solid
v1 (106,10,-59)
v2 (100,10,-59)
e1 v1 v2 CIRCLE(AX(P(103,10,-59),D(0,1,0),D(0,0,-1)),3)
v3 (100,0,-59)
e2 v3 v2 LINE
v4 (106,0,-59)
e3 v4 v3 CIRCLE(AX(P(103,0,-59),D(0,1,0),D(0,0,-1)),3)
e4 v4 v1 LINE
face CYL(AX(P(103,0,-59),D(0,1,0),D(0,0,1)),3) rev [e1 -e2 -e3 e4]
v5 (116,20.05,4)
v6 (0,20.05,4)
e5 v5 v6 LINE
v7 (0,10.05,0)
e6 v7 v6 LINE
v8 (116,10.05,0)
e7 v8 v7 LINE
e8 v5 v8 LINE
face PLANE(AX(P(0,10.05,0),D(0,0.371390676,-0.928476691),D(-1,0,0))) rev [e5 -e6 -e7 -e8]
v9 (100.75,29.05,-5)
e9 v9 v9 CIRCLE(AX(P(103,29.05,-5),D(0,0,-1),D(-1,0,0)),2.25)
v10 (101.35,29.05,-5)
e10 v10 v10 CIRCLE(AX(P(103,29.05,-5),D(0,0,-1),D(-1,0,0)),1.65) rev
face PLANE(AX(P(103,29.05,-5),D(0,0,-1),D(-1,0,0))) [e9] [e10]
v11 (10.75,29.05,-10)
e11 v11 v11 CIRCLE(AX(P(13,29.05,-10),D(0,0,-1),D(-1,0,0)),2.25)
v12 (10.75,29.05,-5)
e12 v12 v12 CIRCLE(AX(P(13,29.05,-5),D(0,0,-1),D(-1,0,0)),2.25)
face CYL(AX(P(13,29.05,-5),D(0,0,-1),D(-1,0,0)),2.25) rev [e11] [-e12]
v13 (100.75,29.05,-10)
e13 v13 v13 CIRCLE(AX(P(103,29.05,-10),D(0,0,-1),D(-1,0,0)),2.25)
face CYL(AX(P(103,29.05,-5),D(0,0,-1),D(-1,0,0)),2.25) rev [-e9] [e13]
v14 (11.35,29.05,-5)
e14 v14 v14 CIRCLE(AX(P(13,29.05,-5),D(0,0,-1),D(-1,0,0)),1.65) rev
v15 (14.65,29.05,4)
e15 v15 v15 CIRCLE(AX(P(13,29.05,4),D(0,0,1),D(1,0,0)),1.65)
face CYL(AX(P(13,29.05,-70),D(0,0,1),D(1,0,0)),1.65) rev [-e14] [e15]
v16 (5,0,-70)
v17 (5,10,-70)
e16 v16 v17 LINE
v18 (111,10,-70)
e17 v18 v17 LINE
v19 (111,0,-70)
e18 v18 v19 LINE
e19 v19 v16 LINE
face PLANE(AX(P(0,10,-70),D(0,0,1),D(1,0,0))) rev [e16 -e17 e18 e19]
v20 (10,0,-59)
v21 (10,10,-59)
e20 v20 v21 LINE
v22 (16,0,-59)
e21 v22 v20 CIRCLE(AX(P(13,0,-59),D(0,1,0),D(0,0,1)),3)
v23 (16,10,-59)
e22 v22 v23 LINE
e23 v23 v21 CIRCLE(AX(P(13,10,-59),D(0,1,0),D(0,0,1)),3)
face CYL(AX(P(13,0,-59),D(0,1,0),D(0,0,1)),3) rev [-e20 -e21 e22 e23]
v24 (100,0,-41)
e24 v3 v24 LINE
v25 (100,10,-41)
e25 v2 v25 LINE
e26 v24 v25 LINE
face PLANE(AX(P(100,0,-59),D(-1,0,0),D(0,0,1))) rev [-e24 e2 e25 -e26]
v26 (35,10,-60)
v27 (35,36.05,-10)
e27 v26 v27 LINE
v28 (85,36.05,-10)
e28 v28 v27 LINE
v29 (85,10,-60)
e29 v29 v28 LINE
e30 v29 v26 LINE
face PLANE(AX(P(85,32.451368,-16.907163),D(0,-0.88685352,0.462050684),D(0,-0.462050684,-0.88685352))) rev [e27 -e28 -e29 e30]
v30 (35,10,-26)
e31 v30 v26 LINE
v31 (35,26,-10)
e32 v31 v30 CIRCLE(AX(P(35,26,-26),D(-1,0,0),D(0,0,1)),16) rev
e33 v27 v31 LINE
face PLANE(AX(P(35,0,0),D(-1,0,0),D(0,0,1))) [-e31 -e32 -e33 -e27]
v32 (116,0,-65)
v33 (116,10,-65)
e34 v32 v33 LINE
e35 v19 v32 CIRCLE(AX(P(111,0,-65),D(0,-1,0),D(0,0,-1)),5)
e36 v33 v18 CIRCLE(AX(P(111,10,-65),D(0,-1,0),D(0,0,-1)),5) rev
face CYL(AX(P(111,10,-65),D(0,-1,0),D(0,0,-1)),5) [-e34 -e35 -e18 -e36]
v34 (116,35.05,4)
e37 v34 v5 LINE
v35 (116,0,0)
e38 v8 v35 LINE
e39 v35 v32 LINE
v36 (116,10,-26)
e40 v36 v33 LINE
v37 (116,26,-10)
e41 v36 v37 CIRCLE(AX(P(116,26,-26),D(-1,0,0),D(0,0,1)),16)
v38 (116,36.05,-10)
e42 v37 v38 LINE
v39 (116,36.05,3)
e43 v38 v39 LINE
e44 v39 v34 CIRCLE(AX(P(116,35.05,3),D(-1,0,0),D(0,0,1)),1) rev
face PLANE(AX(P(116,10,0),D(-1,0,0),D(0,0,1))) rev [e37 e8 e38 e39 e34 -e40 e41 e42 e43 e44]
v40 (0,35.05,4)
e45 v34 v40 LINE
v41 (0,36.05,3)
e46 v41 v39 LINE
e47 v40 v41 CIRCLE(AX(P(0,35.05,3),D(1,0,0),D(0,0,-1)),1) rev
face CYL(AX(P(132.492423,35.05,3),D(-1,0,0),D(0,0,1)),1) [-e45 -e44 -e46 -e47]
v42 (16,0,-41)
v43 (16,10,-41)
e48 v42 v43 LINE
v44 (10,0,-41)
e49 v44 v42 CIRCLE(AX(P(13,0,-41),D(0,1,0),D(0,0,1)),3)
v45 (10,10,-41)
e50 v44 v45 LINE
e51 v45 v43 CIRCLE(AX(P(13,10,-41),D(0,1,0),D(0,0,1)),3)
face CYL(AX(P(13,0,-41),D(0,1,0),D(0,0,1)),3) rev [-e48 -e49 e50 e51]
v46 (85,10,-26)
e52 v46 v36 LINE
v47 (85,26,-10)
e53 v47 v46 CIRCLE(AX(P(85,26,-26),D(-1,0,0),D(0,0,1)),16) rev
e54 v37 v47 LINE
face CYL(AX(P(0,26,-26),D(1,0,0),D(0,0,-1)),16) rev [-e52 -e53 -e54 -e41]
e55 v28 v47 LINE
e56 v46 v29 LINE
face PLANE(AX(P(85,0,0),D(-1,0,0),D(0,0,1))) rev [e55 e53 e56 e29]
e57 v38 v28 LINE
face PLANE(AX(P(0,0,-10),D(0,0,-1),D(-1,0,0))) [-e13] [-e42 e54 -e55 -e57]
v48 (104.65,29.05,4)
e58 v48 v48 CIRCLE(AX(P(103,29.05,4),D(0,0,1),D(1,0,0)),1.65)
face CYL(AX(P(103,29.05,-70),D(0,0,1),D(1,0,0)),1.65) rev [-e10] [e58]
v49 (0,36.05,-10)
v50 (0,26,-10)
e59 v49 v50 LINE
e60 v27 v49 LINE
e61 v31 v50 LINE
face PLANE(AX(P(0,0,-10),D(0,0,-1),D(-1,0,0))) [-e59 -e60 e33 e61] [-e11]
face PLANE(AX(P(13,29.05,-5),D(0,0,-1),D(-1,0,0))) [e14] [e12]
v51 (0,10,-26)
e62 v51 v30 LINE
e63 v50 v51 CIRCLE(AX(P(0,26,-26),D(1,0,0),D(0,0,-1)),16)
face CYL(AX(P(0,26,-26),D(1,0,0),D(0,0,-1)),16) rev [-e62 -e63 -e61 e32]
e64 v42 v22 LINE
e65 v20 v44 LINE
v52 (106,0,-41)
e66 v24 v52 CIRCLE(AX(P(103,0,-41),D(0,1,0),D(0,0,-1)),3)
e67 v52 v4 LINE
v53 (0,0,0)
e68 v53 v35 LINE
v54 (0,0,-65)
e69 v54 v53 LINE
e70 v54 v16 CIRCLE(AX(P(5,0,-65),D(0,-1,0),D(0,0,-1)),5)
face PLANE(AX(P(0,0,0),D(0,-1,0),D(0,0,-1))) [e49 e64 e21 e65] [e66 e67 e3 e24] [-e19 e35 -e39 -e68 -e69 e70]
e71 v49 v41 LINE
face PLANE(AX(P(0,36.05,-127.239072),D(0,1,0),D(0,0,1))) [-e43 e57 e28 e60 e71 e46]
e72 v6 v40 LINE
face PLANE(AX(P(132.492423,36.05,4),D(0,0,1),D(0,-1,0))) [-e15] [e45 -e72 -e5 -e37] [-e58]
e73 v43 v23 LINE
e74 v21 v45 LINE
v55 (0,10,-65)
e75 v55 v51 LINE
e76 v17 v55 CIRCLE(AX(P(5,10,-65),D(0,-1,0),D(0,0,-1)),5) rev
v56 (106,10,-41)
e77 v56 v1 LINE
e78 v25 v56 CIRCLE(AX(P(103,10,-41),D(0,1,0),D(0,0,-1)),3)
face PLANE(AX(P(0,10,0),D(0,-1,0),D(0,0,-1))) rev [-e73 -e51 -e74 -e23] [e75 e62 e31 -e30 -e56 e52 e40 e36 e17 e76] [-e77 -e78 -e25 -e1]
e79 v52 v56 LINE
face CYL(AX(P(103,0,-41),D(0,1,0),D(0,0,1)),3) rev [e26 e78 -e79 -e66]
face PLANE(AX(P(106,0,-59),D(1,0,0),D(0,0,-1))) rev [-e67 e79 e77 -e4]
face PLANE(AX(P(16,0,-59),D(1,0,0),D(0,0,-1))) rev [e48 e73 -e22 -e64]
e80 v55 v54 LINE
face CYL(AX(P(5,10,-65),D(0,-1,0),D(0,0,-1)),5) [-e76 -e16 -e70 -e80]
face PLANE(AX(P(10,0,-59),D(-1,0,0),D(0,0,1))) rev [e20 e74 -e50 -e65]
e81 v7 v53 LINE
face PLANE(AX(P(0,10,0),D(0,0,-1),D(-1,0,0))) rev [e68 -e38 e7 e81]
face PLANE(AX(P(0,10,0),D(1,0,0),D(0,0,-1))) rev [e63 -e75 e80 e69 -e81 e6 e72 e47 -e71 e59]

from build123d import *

# Parameters (mm, degrees)
SKETCH1_W           = 116
SKETCH1_H           = 70
BOSS_EXTRUDE1_DEPTH = 10
SKETCH2_W           = 116
SKETCH2_H           = 9.05
BOSS_EXTRUDE2_DEPTH = 10
CUT_EXTRUDE1_DEPTH  = 136.852861582
SKETCH4_W           = 116
SKETCH4_H           = 17
BOSS_EXTRUDE3_DEPTH = 10
FILLET1_R           = 16
BOSS_EXTRUDE4_START = -85
BOSS_EXTRUDE4_DEPTH = 50
SKETCH7_W           = 4
SKETCH7_H           = 16
BOSS_EXTRUDE5_DEPTH = 116
CHAMFER1_SIZE2      = 4
CHAMFER1_SIZE       = 10
FILLET3_R           = 1
FILLET4_R           = 5
SKETCH8_R           = 1.65
CUT_EXTRUDE2_DEPTH  = 143.237837793
SKETCH9_R           = 2.25
CUT_EXTRUDE3_DEPTH  = 5


with BuildPart() as part:
    # Sketch1 → Boss-Extrude1 (new body)
    with BuildSketch(Plane(origin=(0, 0, 0), x_dir=(1, 0, 0), z_dir=(0, 1, 0))):
        with Locations((58, 35)):
            Rectangle(SKETCH1_W, SKETCH1_H)
    extrude(amount=BOSS_EXTRUDE1_DEPTH)

    # Sketch2 → Boss-Extrude2 (add)
    with BuildSketch(Plane.XY):
        with Locations((58, 14.525)):
            Rectangle(SKETCH2_W, SKETCH2_H)
    extrude(amount=-BOSS_EXTRUDE2_DEPTH)

    # Sketch3 → Cut-Extrude1 (cut, through all)
    with BuildSketch(Plane(origin=(0, 10, 0), x_dir=(1, 0, 0), z_dir=(0, 1, 0))):
        with BuildLine():
            Line((16, 59), (16, 41))
            ThreePointArc((16, 41), (13, 38), (10, 41))
            Line((10, 41), (10, 59))
            ThreePointArc((10, 59), (13, 62), (16, 59))
        make_face()
        with BuildLine():
            Line((100, 59), (100, 41))
            ThreePointArc((100, 41), (103, 38), (106, 41))
            Line((106, 41), (106, 59))
            ThreePointArc((106, 59), (103, 62), (100, 59))
        make_face()
    extrude(amount=-CUT_EXTRUDE1_DEPTH, mode=Mode.SUBTRACT)

    # Sketch4 → Boss-Extrude3 (add)
    with BuildSketch(Plane.XY):
        with Locations((58, 27.55)):
            Rectangle(SKETCH4_W, SKETCH4_H)
    extrude(amount=-BOSS_EXTRUDE3_DEPTH)

    # Fillet1
    fillet1_edges = [part.edges().sort_by_distance(p)[0] for p in [
        (58, 10, -10),
    ]]
    fillet(fillet1_edges, radius=FILLET1_R)

    # Sketch6 → Boss-Extrude4 (add)
    with BuildSketch(Plane.ZY.offset(BOSS_EXTRUDE4_START)):
        with BuildLine():
            Line((-10, 36.05), (-60, 10))
            Line((-60, 10), (-26, 10))
            ThreePointArc((-26, 10), (-14.686291501, 14.686291501), (-10, 26))
            Line((-10, 26), (-10, 36.05))
        make_face()
    extrude(amount=BOSS_EXTRUDE4_DEPTH)

    # Sketch7 → Boss-Extrude5 (add)
    with BuildSketch(Plane.ZY):
        with Locations((2, 28.05)):
            Rectangle(SKETCH7_W, SKETCH7_H)
    extrude(amount=-BOSS_EXTRUDE5_DEPTH)

    # Chamfer1
    chamfer1_edges = [part.edges().sort_by_distance(p)[0] for p in [
        (58, 20.05, 0),
    ]]
    chamfer1_side = [part.faces().sort_by_distance(p)[0] for p in [
        (58, 19.97, 0),
    ]]
    chamfer(chamfer1_edges, length=CHAMFER1_SIZE - 0.0001, length2=CHAMFER1_SIZE2 - 0.0001, reference=chamfer1_side[0])  # a hair under: the kernel refuses the full size

    # Fillet3
    fillet3_edges = [part.edges().sort_by_distance(p)[0] for p in [
        (58, 36.05, 4),
    ]]
    fillet(fillet3_edges, radius=FILLET3_R)

    # Fillet4
    fillet4_edges = [part.edges().sort_by_distance(p)[0] for p in [
        (0, 5, -70),
        (116, 5, -70),
    ]]
    fillet(fillet4_edges, radius=FILLET4_R)

    # Sketch8 → Cut-Extrude2 (cut, through all)
    with BuildSketch(Plane.XY.offset(4)):
        with Locations((13, 29.05)):
            Circle(SKETCH8_R)
        with Locations((103, 29.05)):
            Circle(SKETCH8_R)
    extrude(amount=-CUT_EXTRUDE2_DEPTH, mode=Mode.SUBTRACT)

    # Sketch9 → Cut-Extrude3 (cut)
    with BuildSketch(Plane(origin=(0, 0, -10), x_dir=(-1, 0, 0), z_dir=(0, 0, -1))):
        with Locations((-103, 29.05)):
            Circle(SKETCH9_R)
        with Locations((-13, 29.05)):
            Circle(SKETCH9_R)
    extrude(amount=-CUT_EXTRUDE3_DEPTH, mode=Mode.SUBTRACT)


solid = part.part
